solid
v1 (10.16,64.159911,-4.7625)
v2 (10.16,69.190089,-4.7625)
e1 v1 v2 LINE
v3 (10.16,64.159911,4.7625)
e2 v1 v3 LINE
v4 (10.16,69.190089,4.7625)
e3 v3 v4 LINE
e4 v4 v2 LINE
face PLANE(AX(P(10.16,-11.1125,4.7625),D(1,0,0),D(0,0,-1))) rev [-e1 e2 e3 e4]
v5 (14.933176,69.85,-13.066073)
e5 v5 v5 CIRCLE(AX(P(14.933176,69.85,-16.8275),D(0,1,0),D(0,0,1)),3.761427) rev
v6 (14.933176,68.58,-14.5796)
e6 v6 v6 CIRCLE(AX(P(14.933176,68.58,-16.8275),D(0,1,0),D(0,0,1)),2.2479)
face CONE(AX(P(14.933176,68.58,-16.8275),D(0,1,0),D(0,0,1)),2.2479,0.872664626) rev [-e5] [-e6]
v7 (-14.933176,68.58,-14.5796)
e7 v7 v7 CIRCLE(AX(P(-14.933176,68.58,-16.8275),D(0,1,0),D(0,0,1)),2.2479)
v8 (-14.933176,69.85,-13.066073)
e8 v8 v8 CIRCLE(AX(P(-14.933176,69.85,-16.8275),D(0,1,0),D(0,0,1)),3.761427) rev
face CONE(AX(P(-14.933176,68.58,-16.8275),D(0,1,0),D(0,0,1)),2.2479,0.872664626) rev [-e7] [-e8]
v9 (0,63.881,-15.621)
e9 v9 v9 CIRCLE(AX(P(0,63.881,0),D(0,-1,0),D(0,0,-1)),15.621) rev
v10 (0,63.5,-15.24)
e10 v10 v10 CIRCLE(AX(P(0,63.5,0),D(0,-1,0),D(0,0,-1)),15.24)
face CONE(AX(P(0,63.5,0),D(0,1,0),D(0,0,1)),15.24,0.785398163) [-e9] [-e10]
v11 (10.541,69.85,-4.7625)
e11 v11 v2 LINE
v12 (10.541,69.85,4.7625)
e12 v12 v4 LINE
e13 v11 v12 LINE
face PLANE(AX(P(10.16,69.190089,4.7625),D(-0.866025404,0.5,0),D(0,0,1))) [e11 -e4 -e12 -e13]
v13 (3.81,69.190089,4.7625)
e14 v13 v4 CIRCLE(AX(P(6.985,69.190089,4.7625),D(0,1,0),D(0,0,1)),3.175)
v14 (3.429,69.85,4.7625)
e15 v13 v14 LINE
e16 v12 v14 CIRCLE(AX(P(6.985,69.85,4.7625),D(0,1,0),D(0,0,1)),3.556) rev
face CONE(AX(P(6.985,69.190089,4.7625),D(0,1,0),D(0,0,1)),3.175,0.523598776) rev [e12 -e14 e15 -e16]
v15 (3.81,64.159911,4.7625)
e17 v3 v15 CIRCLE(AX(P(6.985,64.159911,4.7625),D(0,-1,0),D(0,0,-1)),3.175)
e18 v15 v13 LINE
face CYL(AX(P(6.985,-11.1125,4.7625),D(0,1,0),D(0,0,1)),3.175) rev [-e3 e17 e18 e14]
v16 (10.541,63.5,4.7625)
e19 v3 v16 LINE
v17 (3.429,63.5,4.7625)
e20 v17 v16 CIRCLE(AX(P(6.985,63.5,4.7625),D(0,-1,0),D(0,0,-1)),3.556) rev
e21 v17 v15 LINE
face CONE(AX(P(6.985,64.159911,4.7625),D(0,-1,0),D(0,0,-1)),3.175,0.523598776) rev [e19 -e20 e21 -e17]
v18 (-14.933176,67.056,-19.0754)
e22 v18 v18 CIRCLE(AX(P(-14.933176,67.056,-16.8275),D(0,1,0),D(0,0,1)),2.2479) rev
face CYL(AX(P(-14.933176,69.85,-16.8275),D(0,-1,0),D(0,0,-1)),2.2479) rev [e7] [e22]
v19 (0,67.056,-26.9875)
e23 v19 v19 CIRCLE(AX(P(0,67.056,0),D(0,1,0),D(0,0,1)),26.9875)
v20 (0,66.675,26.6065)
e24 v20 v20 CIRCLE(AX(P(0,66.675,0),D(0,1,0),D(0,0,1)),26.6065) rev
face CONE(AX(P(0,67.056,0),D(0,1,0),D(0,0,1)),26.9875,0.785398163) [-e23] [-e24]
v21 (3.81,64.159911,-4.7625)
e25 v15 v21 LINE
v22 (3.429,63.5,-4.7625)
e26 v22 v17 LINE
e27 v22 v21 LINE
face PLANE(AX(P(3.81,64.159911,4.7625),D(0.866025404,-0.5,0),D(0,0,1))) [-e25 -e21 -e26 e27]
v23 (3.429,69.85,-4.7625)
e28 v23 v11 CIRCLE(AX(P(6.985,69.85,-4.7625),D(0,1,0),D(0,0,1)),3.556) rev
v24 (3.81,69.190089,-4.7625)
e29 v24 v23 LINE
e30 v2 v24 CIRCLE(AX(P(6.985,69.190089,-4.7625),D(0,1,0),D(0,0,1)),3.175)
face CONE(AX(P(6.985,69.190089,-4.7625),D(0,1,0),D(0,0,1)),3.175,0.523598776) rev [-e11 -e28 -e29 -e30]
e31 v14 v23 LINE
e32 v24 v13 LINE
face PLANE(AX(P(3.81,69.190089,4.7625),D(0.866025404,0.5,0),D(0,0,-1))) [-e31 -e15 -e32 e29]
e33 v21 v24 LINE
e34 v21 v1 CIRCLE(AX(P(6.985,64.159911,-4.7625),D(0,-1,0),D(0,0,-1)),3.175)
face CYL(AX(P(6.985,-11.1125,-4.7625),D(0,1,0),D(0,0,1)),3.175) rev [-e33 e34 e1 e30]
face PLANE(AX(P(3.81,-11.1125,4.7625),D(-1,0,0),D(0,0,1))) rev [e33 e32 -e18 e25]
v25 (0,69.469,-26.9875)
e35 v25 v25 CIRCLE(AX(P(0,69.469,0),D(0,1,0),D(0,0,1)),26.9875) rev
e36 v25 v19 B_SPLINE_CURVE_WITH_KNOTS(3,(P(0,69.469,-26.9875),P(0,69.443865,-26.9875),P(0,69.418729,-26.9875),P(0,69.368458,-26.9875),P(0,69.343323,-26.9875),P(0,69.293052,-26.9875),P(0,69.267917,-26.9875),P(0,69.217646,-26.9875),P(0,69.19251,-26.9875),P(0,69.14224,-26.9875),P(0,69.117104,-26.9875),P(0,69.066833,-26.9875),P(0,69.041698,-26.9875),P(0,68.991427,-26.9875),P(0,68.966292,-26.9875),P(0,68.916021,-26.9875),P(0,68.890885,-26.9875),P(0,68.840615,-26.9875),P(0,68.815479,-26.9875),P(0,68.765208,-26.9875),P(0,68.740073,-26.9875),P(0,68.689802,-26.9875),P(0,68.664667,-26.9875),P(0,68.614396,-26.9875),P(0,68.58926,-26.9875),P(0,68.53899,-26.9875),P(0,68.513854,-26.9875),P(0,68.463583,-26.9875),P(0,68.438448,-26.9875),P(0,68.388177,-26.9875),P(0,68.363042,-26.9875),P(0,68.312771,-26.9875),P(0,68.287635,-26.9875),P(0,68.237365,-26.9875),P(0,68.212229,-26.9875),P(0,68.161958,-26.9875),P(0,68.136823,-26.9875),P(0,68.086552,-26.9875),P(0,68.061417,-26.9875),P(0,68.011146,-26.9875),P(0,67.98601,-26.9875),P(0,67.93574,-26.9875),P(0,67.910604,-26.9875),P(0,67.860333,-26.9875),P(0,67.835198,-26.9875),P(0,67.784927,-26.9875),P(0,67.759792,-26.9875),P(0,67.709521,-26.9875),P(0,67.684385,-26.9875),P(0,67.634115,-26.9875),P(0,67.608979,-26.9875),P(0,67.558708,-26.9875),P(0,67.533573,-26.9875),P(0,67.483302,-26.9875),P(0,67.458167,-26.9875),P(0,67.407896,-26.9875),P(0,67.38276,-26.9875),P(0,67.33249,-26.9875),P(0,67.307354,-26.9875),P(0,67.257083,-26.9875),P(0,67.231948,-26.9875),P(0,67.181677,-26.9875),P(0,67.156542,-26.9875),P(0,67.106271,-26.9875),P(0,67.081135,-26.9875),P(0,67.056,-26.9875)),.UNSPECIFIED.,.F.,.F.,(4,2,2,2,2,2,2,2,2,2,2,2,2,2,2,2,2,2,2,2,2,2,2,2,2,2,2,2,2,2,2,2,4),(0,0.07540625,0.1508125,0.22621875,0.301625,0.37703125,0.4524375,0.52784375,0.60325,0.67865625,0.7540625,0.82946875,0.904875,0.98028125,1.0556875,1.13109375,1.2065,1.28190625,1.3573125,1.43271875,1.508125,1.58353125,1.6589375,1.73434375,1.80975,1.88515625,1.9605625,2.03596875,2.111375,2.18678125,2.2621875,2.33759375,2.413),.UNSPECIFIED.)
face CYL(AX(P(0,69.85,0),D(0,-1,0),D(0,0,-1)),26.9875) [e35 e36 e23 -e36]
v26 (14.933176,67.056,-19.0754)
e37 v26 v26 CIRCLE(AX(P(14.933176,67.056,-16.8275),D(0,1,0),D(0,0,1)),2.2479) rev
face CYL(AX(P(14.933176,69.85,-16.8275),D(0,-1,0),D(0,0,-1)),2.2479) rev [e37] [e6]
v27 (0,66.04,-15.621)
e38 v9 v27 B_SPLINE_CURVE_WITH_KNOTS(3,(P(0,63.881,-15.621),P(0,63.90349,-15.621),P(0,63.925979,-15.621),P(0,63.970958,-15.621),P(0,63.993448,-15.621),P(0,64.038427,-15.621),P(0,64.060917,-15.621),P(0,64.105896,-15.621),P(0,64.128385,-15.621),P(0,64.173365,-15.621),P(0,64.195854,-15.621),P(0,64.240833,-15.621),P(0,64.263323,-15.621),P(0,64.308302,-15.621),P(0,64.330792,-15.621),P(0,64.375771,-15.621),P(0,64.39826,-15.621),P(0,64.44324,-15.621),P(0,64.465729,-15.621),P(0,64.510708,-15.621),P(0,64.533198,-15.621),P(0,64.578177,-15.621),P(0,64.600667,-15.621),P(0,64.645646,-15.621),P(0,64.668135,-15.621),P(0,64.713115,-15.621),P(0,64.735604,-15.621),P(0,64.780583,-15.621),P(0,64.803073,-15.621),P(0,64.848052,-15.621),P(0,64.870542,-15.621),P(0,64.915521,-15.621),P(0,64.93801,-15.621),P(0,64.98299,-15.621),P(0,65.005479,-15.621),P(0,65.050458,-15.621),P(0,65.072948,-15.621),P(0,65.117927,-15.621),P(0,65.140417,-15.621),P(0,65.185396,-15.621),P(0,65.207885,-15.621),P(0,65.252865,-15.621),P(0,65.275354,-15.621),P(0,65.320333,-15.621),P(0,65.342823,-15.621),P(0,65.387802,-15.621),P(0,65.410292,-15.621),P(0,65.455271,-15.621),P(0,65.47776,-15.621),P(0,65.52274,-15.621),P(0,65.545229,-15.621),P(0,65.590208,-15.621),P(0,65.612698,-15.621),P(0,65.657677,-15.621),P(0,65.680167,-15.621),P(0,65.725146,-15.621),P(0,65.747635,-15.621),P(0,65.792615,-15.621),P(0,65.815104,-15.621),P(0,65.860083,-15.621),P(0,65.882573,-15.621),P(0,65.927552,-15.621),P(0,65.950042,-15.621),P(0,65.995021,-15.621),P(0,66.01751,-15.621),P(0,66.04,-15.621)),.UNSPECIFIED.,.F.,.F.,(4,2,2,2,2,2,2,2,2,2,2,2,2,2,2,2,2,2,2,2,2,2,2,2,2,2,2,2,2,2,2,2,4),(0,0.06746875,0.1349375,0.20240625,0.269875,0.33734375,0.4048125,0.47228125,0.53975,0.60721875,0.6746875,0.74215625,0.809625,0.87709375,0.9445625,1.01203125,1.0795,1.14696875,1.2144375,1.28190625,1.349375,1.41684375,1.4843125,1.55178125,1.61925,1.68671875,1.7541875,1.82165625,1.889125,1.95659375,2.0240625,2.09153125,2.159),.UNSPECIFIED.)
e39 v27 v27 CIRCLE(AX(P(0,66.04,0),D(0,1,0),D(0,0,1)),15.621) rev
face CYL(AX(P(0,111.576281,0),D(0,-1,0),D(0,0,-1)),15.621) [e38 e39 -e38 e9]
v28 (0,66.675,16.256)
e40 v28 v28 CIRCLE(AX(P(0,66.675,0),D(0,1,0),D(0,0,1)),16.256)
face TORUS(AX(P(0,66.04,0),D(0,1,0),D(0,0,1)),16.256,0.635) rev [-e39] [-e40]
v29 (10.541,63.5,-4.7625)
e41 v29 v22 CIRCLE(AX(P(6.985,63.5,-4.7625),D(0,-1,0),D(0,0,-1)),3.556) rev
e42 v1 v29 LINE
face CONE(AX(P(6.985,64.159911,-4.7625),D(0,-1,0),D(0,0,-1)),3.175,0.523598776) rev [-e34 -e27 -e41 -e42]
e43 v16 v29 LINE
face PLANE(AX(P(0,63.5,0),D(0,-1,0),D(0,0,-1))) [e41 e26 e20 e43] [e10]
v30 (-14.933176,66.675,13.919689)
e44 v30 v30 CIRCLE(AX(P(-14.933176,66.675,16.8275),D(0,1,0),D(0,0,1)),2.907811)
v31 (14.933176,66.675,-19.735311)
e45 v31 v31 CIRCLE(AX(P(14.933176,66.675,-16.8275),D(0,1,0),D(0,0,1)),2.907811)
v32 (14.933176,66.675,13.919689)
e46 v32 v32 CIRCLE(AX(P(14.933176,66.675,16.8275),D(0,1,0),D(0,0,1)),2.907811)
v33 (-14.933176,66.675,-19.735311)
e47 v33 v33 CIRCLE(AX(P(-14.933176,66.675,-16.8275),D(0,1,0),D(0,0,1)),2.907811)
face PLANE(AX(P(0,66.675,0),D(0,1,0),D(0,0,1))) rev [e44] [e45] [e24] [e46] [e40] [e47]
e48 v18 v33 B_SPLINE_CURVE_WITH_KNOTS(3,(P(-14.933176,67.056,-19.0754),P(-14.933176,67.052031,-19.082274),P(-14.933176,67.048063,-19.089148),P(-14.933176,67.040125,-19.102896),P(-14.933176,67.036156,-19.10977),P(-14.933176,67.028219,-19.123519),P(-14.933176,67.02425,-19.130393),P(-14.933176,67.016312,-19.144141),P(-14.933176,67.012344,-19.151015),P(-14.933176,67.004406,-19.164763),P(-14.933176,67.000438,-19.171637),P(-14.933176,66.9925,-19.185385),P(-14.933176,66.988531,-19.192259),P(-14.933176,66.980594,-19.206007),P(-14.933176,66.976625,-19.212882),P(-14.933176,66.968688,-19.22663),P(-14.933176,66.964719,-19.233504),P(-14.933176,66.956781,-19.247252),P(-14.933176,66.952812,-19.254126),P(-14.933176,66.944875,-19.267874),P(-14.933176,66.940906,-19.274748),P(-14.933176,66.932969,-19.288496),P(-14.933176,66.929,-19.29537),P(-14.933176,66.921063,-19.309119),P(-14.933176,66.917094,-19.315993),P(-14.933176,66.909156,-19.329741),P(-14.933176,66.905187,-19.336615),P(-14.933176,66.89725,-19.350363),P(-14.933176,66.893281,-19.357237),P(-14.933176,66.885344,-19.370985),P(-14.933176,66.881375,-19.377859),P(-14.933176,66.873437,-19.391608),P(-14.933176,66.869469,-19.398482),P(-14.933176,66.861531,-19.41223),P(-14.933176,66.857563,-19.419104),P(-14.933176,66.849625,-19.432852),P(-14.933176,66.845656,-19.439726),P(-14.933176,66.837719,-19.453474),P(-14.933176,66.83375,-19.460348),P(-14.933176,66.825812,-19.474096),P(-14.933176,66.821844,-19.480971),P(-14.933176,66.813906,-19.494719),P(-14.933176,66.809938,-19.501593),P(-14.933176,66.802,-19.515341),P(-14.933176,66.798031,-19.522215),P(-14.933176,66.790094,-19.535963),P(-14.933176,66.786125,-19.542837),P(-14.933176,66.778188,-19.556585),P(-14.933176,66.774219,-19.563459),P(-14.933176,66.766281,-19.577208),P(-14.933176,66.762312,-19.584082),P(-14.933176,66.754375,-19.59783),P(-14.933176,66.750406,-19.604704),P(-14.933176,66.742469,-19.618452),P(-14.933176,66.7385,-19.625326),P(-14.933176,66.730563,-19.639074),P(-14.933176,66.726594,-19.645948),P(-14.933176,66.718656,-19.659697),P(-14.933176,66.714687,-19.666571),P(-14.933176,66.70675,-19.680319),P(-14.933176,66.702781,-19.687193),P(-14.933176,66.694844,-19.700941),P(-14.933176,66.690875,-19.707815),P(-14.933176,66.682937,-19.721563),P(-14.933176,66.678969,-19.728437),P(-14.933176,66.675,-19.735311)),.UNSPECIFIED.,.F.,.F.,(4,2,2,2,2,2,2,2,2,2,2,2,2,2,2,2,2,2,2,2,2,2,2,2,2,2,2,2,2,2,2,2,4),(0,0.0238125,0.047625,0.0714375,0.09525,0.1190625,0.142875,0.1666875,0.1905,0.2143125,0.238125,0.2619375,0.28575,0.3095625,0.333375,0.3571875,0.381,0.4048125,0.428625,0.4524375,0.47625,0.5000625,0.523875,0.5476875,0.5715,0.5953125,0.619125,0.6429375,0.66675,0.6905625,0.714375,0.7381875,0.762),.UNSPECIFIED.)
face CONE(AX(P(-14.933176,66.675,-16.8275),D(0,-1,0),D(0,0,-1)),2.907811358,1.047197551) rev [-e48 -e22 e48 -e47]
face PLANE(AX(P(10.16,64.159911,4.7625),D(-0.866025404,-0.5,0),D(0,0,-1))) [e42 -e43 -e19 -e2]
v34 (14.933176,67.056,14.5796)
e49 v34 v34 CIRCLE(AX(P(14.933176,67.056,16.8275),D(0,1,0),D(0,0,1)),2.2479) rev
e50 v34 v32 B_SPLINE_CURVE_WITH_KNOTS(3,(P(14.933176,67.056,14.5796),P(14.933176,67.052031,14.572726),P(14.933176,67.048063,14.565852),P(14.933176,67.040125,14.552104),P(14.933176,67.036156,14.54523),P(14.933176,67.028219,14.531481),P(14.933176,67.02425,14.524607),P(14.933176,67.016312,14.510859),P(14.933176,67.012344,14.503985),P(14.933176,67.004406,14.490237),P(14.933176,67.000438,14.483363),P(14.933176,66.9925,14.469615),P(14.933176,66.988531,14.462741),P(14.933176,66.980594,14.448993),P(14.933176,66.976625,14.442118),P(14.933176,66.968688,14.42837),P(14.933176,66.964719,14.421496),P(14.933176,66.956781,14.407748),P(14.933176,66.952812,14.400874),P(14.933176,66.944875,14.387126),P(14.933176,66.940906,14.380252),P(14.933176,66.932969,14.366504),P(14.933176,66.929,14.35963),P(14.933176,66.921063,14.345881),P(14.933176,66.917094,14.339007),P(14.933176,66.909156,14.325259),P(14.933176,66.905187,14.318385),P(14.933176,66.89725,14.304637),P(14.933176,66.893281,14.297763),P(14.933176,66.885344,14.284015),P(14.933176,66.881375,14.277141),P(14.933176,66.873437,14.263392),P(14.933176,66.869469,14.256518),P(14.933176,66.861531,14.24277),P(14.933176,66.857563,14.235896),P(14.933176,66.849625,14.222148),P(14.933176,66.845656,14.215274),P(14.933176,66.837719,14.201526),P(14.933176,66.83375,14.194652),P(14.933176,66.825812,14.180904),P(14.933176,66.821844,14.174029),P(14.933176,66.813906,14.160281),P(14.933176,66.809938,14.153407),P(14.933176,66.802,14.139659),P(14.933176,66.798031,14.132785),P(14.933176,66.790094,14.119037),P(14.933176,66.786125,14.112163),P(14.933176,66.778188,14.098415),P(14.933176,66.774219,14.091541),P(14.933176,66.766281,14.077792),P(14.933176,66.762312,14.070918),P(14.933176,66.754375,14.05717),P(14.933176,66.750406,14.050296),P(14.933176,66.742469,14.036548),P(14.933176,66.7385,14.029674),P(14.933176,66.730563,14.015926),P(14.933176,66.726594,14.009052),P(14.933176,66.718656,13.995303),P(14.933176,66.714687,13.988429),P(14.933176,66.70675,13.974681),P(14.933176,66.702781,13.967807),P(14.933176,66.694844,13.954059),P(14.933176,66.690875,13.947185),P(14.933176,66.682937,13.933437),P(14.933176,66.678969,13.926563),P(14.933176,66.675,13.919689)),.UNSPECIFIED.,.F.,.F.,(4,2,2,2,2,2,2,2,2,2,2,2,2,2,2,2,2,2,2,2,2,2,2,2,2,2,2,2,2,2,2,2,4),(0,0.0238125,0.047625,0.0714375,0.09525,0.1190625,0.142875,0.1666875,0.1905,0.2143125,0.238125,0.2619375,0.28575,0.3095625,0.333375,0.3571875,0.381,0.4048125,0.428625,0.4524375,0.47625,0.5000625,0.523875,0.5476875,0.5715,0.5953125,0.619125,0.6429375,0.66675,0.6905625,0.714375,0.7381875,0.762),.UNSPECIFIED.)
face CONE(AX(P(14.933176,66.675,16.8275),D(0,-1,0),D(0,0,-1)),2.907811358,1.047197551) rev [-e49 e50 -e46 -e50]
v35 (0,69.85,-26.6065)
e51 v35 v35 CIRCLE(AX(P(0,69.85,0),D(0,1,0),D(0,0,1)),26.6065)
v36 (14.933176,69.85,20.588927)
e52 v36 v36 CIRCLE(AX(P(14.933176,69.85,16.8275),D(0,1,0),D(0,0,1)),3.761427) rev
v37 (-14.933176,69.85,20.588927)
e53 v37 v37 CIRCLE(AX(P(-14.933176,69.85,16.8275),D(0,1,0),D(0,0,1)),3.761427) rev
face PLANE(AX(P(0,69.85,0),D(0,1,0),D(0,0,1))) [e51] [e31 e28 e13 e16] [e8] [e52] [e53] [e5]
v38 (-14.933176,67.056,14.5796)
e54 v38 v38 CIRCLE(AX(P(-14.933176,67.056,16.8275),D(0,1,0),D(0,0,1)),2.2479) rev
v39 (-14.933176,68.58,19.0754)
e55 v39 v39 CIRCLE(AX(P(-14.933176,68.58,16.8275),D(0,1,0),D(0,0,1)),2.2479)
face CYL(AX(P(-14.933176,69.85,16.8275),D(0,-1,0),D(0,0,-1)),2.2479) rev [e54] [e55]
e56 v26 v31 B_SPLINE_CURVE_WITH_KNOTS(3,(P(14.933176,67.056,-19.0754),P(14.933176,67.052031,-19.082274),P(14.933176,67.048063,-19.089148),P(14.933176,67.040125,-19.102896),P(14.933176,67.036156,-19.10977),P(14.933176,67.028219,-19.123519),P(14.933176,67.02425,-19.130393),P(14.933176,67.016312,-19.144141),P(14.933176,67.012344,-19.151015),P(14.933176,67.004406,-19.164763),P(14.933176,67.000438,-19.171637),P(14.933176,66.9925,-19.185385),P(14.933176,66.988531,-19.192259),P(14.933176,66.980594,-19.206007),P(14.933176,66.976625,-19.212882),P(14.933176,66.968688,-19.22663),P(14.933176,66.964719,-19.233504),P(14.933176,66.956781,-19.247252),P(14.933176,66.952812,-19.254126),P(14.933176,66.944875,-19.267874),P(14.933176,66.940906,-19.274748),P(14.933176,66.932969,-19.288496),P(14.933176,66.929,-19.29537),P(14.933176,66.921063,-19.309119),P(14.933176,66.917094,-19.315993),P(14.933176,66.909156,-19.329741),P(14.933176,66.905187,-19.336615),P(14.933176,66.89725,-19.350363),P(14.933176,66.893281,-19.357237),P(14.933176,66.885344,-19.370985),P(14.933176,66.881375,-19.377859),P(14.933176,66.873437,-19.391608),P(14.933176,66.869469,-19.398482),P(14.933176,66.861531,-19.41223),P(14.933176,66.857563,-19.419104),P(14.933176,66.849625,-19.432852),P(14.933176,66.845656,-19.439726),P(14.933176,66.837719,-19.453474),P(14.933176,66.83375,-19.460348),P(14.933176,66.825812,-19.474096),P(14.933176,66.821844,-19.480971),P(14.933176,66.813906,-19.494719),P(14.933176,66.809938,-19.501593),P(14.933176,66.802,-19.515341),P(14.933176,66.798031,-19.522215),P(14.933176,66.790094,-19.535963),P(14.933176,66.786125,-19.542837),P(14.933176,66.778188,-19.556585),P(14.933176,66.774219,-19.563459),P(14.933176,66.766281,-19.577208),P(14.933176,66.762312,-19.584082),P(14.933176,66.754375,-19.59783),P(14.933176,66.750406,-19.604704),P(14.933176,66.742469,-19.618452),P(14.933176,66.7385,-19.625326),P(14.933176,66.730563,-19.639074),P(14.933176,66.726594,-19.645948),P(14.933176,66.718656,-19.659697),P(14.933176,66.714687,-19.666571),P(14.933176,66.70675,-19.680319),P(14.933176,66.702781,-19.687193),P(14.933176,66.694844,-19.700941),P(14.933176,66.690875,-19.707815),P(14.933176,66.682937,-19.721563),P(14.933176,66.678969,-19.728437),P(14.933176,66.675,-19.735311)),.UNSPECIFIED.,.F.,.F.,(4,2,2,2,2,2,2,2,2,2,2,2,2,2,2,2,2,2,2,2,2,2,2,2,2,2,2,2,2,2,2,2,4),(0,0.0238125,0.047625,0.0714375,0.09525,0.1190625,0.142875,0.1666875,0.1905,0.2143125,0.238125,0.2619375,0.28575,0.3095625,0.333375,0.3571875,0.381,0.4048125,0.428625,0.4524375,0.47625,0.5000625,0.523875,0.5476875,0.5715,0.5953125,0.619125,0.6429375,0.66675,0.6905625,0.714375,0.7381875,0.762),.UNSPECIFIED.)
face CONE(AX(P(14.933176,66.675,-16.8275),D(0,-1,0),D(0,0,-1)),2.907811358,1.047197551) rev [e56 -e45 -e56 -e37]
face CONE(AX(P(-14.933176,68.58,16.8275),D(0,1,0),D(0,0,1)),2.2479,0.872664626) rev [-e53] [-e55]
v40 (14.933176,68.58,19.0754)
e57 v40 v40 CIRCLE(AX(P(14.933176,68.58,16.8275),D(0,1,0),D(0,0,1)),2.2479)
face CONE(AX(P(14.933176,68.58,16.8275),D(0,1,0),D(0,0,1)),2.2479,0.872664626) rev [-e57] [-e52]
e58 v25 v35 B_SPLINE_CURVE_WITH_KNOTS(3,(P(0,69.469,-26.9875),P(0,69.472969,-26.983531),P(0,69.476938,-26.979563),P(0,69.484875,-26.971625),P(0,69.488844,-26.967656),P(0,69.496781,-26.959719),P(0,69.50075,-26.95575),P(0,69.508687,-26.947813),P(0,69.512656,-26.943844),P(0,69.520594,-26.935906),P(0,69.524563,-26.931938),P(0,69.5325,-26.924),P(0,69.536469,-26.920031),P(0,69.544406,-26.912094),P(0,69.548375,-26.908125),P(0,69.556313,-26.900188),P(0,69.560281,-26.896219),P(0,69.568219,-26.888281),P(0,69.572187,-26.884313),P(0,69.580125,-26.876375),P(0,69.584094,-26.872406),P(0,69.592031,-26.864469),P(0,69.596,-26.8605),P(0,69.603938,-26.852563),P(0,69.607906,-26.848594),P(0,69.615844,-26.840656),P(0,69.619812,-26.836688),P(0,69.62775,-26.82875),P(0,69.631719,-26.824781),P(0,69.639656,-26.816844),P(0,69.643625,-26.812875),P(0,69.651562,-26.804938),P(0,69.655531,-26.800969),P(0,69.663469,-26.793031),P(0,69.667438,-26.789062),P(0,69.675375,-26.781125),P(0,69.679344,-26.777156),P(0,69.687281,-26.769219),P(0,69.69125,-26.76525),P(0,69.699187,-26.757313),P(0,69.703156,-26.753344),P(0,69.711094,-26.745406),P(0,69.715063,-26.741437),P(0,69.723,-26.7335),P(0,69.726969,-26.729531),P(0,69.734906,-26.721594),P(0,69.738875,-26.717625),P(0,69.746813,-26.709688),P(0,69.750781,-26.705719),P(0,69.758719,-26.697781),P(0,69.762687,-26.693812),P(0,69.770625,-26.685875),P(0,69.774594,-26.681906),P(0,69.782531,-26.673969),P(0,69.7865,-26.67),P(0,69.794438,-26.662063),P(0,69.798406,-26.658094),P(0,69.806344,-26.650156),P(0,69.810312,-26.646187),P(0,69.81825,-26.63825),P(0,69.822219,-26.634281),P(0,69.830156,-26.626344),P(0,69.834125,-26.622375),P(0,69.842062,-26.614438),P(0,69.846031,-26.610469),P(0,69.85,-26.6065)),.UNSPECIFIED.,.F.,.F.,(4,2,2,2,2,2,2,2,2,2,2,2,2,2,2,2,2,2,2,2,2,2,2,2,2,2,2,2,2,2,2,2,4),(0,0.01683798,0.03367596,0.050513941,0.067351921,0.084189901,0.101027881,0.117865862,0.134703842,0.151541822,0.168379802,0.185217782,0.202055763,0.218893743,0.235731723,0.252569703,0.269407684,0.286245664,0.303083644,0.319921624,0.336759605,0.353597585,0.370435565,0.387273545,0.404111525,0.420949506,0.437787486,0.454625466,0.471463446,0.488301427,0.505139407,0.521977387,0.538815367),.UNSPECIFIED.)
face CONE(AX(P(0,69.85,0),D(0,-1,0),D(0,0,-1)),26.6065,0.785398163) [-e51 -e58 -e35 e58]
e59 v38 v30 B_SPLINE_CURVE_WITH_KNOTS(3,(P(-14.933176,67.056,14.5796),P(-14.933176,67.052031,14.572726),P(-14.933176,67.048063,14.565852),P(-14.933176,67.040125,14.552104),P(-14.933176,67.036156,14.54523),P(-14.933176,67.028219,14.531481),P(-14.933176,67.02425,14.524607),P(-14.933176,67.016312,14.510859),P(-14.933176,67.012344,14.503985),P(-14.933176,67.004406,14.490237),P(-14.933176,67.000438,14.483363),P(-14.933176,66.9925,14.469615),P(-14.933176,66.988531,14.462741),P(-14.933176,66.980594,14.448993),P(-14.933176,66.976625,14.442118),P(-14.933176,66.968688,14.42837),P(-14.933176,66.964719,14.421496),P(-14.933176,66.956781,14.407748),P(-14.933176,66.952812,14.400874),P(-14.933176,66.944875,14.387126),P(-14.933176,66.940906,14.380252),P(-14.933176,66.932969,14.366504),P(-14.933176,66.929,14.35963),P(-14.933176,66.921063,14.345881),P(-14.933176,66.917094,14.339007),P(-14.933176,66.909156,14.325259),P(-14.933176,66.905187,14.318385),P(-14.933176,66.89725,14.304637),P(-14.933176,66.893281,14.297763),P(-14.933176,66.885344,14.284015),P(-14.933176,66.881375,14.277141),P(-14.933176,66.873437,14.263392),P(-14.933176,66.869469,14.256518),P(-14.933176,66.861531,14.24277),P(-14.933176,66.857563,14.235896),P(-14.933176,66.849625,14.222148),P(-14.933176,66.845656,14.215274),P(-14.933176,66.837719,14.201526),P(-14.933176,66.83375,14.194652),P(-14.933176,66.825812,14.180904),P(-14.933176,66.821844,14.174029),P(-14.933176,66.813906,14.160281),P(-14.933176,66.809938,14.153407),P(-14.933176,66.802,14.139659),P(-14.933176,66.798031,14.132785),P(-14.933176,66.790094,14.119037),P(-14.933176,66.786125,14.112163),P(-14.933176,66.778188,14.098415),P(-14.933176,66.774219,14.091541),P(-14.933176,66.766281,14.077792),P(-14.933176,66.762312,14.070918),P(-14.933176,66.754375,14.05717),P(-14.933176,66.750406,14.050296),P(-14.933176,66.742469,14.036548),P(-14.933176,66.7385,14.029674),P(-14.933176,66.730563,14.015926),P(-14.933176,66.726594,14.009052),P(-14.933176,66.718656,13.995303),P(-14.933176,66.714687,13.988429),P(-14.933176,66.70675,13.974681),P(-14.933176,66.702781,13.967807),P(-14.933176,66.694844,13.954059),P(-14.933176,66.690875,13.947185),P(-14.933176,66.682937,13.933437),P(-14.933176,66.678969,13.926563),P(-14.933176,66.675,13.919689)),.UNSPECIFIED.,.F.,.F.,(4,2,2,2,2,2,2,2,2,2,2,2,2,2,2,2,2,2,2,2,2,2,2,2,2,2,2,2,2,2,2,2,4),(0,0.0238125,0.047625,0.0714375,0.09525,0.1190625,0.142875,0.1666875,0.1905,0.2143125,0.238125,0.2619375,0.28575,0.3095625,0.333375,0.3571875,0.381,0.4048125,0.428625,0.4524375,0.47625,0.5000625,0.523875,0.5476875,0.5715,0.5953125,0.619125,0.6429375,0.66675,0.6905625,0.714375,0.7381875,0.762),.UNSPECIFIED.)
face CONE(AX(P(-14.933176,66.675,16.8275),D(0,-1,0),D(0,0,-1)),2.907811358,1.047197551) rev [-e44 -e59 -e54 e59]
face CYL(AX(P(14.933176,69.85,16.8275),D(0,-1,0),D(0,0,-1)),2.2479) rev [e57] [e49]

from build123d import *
from OCP.BRepFilletAPI import BRepFilletAPI_MakeChamfer

# Parameters (mm, degrees)
STOCK_DGT_START                               = 66.675
STOCK_DGT_INSIDE_SWERVE_STRUCTURE_SM_2_R      = 26.9875
STOCK_DGT_INSIDE_SWERVE_STRUCTURE_SM_2_R_2    = 2.2479
STOCK_DGT_INSIDE_SWERVE_STRUCTURE_SMALL_DEPTH = 3.175
STOCK_DGT_START_2                             = 63.5
STOCK_DGT_INSIDE_SWERVE_STRUCTURE_SM_3_O_R    = 15.875
STOCK_DGT_INSIDE_SWERVE_STRUCTURE_SM_3_DEPTH  = 3.175
SKETCH1_R                                     = 15.875
SKETCH1_R_2                                   = 15.621
CUT_EXTRUDE1_DEPTH                            = 3.175
FILLET1_R                                     = 0.635
CHAMFER1_SIZE                                 = 0.381
CHAMFER2_SIZE                                 = 0.381
CHAMFER2_SIZE2                                = 0.659911358
CHAMFER3_SIZE                                 = 1.27
CHAMFER3_SIZE2                                = 1.513527063


# Read off the part's stored shape, not the designer's step: Stock-DGT inside swerve structure Small Bearing-1
with BuildPart() as part:
    # Stock-DGT inside swerve structure Sm 2 → Stock-DGT inside swerve structure Small Bearing-1 (new body)
    with BuildSketch(Plane(origin=(0, 0, 0), x_dir=(1, 0, 0), z_dir=(0, 1, 0)).offset(STOCK_DGT_START)):
        Circle(STOCK_DGT_INSIDE_SWERVE_STRUCTURE_SM_2_R)
        with Locations((-14.933176064, -16.8275)):
            Circle(STOCK_DGT_INSIDE_SWERVE_STRUCTURE_SM_2_R_2, mode=Mode.SUBTRACT)
        with Locations((14.933176064, -16.8275)):
            Circle(STOCK_DGT_INSIDE_SWERVE_STRUCTURE_SM_2_R_2, mode=Mode.SUBTRACT)
        with Locations((-14.933176064, 16.8275)):
            Circle(STOCK_DGT_INSIDE_SWERVE_STRUCTURE_SM_2_R_2, mode=Mode.SUBTRACT)
        with Locations((14.933176064, 16.8275)):
            Circle(STOCK_DGT_INSIDE_SWERVE_STRUCTURE_SM_2_R_2, mode=Mode.SUBTRACT)
        with BuildLine():
            Line((3.81, -4.7625), (3.81, 4.7625))
            ThreePointArc((3.81, 4.7625), (6.985, 7.9375), (10.16, 4.7625))
            Line((10.16, 4.7625), (10.16, -4.7625))
            ThreePointArc((10.16, -4.7625), (6.985, -7.9375), (3.81, -4.7625))
        make_face(mode=Mode.SUBTRACT)
    extrude(amount=STOCK_DGT_INSIDE_SWERVE_STRUCTURE_SMALL_DEPTH)

    # Stock-DGT inside swerve structure Sm 3 o → Stock-DGT inside swerve structure Sm 3 (add)
    with BuildSketch(Plane(origin=(0, 0, 0), x_dir=(1, 0, 0), z_dir=(0, 1, 0)).offset(STOCK_DGT_START_2)):
        Circle(STOCK_DGT_INSIDE_SWERVE_STRUCTURE_SM_3_O_R)
        with BuildLine():
            ThreePointArc((10.16, -4.7625), (6.985, -7.9375), (3.81, -4.7625))
            Line((3.81, -4.7625), (3.81, 4.7625))
            ThreePointArc((3.81, 4.7625), (6.985, 7.9375), (10.16, 4.7625))
            Line((10.16, 4.7625), (10.16, -4.7625))
        make_face(mode=Mode.SUBTRACT)
    extrude(amount=STOCK_DGT_INSIDE_SWERVE_STRUCTURE_SM_3_DEPTH)

    # Sketch1 → Cut-Extrude1 (cut)
    with BuildSketch(Plane.XZ.offset(-63.5)):
        Circle(SKETCH1_R)
        with Locations(Location((0, 0, 0), (0, 0, 270))):
            Circle(SKETCH1_R_2, mode=Mode.SUBTRACT)
    extrude(amount=-CUT_EXTRUDE1_DEPTH, mode=Mode.SUBTRACT)

    # Fillet1
    fillet1_edges = [part.edges().sort_by_distance(p)[0] for p in [
        (0, 66.675, 15.621),
    ]]
    fillet(fillet1_edges, radius=FILLET1_R)

    # Chamfer1
    chamfer1_edges = [part.edges().sort_by_distance(p)[0] for p in [
        (-26.9875, 66.675, 0),
        (-26.9875, 69.85, 0),
        (0, 63.5, 15.621),
    ]]
    chamfer(chamfer1_edges, length=CHAMFER1_SIZE)

    # Chamfer2: one chamfer whose edges measure the first distance from different faces: ONE call of the kernel's chamfer builder (chamfer() names one face for all edges)
    chamfer2_edges_1 = [part.edges().sort_by_distance(p)[0] for p in [
        (-17.181076064, 66.675, -16.8275),
    ]]
    chamfer2_side_1 = [part.faces().sort_by_distance(p)[0] for p in [
        (-17.181076064, 68.2625, -16.8275),
    ]]
    chamfer2_edges_2 = [part.edges().sort_by_distance(p)[0] for p in [
        (-17.181076064, 66.675, 16.8275),
    ]]
    chamfer2_side_2 = [part.faces().sort_by_distance(p)[0] for p in [
        (-17.181076064, 68.2625, 16.8275),
    ]]
    chamfer2_edges_3 = [part.edges().sort_by_distance(p)[0] for p in [
        (10.16, 63.5, 0),
        (6.985, 63.5, -7.9375),
        (3.81, 63.5, 0),
        (6.985, 63.5, 7.9375),
    ]]
    chamfer2_side_3 = [part.faces().sort_by_distance(p)[0] for p in [
        (-1.009698226, 63.5, 0),
    ]]
    chamfer2_edges_4 = [part.edges().sort_by_distance(p)[0] for p in [
        (6.985, 69.85, 7.9375),
        (10.16, 69.85, 0),
        (6.985, 69.85, -7.9375),
        (3.81, 69.85, 0),
    ]]
    chamfer2_side_4 = [part.faces().sort_by_distance(p)[0] for p in [
        (-0.311216165, 69.85, 0),
    ]]
    chamfer2_edges_5 = [part.edges().sort_by_distance(p)[0] for p in [
        (12.685276064, 66.675, 16.8275),
    ]]
    chamfer2_side_5 = [part.faces().sort_by_distance(p)[0] for p in [
        (12.685276064, 68.2625, 16.8275),
    ]]
    chamfer2_edges_6 = [part.edges().sort_by_distance(p)[0] for p in [
        (12.685276064, 66.675, -16.8275),
    ]]
    chamfer2_side_6 = [part.faces().sort_by_distance(p)[0] for p in [
        (12.685276064, 68.2625, -16.8275),
    ]]
    chamfer2 = BRepFilletAPI_MakeChamfer(part.part.solid().wrapped)
    for e in chamfer2_edges_1:
        chamfer2.Add(CHAMFER2_SIZE, CHAMFER2_SIZE2, e.wrapped, chamfer2_side_1[0].wrapped)  # the first distance lies on this face
    for e in chamfer2_edges_2:
        chamfer2.Add(CHAMFER2_SIZE, CHAMFER2_SIZE2, e.wrapped, chamfer2_side_2[0].wrapped)  # the first distance lies on this face
    for e in chamfer2_edges_3:
        chamfer2.Add(CHAMFER2_SIZE, CHAMFER2_SIZE2, e.wrapped, chamfer2_side_3[0].wrapped)  # the first distance lies on this face
    for e in chamfer2_edges_4:
        chamfer2.Add(CHAMFER2_SIZE, CHAMFER2_SIZE2, e.wrapped, chamfer2_side_4[0].wrapped)  # the first distance lies on this face
    for e in chamfer2_edges_5:
        chamfer2.Add(CHAMFER2_SIZE, CHAMFER2_SIZE2, e.wrapped, chamfer2_side_5[0].wrapped)  # the first distance lies on this face
    for e in chamfer2_edges_6:
        chamfer2.Add(CHAMFER2_SIZE, CHAMFER2_SIZE2, e.wrapped, chamfer2_side_6[0].wrapped)  # the first distance lies on this face
    add(Compound.cast(chamfer2.Shape()), mode=Mode.REPLACE)

    # Chamfer3: one chamfer whose edges measure the first distance from different faces: ONE call of the kernel's chamfer builder (chamfer() names one face for all edges)
    chamfer3_edges_1 = [part.edges().sort_by_distance(p)[0] for p in [
        (-17.181076064, 69.85, -16.8275),
    ]]
    chamfer3_side_1 = [part.faces().sort_by_distance(p)[0] for p in [
        (-17.181076064, 68.453, -16.8275),
    ]]
    chamfer3_edges_2 = [part.edges().sort_by_distance(p)[0] for p in [
        (-17.181076064, 69.85, 16.8275),
    ]]
    chamfer3_side_2 = [part.faces().sort_by_distance(p)[0] for p in [
        (-17.181076064, 68.453, 16.8275),
    ]]
    chamfer3_edges_3 = [part.edges().sort_by_distance(p)[0] for p in [
        (12.685276064, 69.85, 16.8275),
    ]]
    chamfer3_side_3 = [part.faces().sort_by_distance(p)[0] for p in [
        (12.685276064, 68.453, 16.8275),
    ]]
    chamfer3_edges_4 = [part.edges().sort_by_distance(p)[0] for p in [
        (12.685276064, 69.85, -16.8275),
    ]]
    chamfer3_side_4 = [part.faces().sort_by_distance(p)[0] for p in [
        (12.685276064, 68.453, -16.8275),
    ]]
    chamfer3 = BRepFilletAPI_MakeChamfer(part.part.solid().wrapped)
    for e in chamfer3_edges_1:
        chamfer3.Add(CHAMFER3_SIZE, CHAMFER3_SIZE2, e.wrapped, chamfer3_side_1[0].wrapped)  # the first distance lies on this face
    for e in chamfer3_edges_2:
        chamfer3.Add(CHAMFER3_SIZE, CHAMFER3_SIZE2, e.wrapped, chamfer3_side_2[0].wrapped)  # the first distance lies on this face
    for e in chamfer3_edges_3:
        chamfer3.Add(CHAMFER3_SIZE, CHAMFER3_SIZE2, e.wrapped, chamfer3_side_3[0].wrapped)  # the first distance lies on this face
    for e in chamfer3_edges_4:
        chamfer3.Add(CHAMFER3_SIZE, CHAMFER3_SIZE2, e.wrapped, chamfer3_side_4[0].wrapped)  # the first distance lies on this face
    add(Compound.cast(chamfer3.Shape()), mode=Mode.REPLACE)


solid = part.part
